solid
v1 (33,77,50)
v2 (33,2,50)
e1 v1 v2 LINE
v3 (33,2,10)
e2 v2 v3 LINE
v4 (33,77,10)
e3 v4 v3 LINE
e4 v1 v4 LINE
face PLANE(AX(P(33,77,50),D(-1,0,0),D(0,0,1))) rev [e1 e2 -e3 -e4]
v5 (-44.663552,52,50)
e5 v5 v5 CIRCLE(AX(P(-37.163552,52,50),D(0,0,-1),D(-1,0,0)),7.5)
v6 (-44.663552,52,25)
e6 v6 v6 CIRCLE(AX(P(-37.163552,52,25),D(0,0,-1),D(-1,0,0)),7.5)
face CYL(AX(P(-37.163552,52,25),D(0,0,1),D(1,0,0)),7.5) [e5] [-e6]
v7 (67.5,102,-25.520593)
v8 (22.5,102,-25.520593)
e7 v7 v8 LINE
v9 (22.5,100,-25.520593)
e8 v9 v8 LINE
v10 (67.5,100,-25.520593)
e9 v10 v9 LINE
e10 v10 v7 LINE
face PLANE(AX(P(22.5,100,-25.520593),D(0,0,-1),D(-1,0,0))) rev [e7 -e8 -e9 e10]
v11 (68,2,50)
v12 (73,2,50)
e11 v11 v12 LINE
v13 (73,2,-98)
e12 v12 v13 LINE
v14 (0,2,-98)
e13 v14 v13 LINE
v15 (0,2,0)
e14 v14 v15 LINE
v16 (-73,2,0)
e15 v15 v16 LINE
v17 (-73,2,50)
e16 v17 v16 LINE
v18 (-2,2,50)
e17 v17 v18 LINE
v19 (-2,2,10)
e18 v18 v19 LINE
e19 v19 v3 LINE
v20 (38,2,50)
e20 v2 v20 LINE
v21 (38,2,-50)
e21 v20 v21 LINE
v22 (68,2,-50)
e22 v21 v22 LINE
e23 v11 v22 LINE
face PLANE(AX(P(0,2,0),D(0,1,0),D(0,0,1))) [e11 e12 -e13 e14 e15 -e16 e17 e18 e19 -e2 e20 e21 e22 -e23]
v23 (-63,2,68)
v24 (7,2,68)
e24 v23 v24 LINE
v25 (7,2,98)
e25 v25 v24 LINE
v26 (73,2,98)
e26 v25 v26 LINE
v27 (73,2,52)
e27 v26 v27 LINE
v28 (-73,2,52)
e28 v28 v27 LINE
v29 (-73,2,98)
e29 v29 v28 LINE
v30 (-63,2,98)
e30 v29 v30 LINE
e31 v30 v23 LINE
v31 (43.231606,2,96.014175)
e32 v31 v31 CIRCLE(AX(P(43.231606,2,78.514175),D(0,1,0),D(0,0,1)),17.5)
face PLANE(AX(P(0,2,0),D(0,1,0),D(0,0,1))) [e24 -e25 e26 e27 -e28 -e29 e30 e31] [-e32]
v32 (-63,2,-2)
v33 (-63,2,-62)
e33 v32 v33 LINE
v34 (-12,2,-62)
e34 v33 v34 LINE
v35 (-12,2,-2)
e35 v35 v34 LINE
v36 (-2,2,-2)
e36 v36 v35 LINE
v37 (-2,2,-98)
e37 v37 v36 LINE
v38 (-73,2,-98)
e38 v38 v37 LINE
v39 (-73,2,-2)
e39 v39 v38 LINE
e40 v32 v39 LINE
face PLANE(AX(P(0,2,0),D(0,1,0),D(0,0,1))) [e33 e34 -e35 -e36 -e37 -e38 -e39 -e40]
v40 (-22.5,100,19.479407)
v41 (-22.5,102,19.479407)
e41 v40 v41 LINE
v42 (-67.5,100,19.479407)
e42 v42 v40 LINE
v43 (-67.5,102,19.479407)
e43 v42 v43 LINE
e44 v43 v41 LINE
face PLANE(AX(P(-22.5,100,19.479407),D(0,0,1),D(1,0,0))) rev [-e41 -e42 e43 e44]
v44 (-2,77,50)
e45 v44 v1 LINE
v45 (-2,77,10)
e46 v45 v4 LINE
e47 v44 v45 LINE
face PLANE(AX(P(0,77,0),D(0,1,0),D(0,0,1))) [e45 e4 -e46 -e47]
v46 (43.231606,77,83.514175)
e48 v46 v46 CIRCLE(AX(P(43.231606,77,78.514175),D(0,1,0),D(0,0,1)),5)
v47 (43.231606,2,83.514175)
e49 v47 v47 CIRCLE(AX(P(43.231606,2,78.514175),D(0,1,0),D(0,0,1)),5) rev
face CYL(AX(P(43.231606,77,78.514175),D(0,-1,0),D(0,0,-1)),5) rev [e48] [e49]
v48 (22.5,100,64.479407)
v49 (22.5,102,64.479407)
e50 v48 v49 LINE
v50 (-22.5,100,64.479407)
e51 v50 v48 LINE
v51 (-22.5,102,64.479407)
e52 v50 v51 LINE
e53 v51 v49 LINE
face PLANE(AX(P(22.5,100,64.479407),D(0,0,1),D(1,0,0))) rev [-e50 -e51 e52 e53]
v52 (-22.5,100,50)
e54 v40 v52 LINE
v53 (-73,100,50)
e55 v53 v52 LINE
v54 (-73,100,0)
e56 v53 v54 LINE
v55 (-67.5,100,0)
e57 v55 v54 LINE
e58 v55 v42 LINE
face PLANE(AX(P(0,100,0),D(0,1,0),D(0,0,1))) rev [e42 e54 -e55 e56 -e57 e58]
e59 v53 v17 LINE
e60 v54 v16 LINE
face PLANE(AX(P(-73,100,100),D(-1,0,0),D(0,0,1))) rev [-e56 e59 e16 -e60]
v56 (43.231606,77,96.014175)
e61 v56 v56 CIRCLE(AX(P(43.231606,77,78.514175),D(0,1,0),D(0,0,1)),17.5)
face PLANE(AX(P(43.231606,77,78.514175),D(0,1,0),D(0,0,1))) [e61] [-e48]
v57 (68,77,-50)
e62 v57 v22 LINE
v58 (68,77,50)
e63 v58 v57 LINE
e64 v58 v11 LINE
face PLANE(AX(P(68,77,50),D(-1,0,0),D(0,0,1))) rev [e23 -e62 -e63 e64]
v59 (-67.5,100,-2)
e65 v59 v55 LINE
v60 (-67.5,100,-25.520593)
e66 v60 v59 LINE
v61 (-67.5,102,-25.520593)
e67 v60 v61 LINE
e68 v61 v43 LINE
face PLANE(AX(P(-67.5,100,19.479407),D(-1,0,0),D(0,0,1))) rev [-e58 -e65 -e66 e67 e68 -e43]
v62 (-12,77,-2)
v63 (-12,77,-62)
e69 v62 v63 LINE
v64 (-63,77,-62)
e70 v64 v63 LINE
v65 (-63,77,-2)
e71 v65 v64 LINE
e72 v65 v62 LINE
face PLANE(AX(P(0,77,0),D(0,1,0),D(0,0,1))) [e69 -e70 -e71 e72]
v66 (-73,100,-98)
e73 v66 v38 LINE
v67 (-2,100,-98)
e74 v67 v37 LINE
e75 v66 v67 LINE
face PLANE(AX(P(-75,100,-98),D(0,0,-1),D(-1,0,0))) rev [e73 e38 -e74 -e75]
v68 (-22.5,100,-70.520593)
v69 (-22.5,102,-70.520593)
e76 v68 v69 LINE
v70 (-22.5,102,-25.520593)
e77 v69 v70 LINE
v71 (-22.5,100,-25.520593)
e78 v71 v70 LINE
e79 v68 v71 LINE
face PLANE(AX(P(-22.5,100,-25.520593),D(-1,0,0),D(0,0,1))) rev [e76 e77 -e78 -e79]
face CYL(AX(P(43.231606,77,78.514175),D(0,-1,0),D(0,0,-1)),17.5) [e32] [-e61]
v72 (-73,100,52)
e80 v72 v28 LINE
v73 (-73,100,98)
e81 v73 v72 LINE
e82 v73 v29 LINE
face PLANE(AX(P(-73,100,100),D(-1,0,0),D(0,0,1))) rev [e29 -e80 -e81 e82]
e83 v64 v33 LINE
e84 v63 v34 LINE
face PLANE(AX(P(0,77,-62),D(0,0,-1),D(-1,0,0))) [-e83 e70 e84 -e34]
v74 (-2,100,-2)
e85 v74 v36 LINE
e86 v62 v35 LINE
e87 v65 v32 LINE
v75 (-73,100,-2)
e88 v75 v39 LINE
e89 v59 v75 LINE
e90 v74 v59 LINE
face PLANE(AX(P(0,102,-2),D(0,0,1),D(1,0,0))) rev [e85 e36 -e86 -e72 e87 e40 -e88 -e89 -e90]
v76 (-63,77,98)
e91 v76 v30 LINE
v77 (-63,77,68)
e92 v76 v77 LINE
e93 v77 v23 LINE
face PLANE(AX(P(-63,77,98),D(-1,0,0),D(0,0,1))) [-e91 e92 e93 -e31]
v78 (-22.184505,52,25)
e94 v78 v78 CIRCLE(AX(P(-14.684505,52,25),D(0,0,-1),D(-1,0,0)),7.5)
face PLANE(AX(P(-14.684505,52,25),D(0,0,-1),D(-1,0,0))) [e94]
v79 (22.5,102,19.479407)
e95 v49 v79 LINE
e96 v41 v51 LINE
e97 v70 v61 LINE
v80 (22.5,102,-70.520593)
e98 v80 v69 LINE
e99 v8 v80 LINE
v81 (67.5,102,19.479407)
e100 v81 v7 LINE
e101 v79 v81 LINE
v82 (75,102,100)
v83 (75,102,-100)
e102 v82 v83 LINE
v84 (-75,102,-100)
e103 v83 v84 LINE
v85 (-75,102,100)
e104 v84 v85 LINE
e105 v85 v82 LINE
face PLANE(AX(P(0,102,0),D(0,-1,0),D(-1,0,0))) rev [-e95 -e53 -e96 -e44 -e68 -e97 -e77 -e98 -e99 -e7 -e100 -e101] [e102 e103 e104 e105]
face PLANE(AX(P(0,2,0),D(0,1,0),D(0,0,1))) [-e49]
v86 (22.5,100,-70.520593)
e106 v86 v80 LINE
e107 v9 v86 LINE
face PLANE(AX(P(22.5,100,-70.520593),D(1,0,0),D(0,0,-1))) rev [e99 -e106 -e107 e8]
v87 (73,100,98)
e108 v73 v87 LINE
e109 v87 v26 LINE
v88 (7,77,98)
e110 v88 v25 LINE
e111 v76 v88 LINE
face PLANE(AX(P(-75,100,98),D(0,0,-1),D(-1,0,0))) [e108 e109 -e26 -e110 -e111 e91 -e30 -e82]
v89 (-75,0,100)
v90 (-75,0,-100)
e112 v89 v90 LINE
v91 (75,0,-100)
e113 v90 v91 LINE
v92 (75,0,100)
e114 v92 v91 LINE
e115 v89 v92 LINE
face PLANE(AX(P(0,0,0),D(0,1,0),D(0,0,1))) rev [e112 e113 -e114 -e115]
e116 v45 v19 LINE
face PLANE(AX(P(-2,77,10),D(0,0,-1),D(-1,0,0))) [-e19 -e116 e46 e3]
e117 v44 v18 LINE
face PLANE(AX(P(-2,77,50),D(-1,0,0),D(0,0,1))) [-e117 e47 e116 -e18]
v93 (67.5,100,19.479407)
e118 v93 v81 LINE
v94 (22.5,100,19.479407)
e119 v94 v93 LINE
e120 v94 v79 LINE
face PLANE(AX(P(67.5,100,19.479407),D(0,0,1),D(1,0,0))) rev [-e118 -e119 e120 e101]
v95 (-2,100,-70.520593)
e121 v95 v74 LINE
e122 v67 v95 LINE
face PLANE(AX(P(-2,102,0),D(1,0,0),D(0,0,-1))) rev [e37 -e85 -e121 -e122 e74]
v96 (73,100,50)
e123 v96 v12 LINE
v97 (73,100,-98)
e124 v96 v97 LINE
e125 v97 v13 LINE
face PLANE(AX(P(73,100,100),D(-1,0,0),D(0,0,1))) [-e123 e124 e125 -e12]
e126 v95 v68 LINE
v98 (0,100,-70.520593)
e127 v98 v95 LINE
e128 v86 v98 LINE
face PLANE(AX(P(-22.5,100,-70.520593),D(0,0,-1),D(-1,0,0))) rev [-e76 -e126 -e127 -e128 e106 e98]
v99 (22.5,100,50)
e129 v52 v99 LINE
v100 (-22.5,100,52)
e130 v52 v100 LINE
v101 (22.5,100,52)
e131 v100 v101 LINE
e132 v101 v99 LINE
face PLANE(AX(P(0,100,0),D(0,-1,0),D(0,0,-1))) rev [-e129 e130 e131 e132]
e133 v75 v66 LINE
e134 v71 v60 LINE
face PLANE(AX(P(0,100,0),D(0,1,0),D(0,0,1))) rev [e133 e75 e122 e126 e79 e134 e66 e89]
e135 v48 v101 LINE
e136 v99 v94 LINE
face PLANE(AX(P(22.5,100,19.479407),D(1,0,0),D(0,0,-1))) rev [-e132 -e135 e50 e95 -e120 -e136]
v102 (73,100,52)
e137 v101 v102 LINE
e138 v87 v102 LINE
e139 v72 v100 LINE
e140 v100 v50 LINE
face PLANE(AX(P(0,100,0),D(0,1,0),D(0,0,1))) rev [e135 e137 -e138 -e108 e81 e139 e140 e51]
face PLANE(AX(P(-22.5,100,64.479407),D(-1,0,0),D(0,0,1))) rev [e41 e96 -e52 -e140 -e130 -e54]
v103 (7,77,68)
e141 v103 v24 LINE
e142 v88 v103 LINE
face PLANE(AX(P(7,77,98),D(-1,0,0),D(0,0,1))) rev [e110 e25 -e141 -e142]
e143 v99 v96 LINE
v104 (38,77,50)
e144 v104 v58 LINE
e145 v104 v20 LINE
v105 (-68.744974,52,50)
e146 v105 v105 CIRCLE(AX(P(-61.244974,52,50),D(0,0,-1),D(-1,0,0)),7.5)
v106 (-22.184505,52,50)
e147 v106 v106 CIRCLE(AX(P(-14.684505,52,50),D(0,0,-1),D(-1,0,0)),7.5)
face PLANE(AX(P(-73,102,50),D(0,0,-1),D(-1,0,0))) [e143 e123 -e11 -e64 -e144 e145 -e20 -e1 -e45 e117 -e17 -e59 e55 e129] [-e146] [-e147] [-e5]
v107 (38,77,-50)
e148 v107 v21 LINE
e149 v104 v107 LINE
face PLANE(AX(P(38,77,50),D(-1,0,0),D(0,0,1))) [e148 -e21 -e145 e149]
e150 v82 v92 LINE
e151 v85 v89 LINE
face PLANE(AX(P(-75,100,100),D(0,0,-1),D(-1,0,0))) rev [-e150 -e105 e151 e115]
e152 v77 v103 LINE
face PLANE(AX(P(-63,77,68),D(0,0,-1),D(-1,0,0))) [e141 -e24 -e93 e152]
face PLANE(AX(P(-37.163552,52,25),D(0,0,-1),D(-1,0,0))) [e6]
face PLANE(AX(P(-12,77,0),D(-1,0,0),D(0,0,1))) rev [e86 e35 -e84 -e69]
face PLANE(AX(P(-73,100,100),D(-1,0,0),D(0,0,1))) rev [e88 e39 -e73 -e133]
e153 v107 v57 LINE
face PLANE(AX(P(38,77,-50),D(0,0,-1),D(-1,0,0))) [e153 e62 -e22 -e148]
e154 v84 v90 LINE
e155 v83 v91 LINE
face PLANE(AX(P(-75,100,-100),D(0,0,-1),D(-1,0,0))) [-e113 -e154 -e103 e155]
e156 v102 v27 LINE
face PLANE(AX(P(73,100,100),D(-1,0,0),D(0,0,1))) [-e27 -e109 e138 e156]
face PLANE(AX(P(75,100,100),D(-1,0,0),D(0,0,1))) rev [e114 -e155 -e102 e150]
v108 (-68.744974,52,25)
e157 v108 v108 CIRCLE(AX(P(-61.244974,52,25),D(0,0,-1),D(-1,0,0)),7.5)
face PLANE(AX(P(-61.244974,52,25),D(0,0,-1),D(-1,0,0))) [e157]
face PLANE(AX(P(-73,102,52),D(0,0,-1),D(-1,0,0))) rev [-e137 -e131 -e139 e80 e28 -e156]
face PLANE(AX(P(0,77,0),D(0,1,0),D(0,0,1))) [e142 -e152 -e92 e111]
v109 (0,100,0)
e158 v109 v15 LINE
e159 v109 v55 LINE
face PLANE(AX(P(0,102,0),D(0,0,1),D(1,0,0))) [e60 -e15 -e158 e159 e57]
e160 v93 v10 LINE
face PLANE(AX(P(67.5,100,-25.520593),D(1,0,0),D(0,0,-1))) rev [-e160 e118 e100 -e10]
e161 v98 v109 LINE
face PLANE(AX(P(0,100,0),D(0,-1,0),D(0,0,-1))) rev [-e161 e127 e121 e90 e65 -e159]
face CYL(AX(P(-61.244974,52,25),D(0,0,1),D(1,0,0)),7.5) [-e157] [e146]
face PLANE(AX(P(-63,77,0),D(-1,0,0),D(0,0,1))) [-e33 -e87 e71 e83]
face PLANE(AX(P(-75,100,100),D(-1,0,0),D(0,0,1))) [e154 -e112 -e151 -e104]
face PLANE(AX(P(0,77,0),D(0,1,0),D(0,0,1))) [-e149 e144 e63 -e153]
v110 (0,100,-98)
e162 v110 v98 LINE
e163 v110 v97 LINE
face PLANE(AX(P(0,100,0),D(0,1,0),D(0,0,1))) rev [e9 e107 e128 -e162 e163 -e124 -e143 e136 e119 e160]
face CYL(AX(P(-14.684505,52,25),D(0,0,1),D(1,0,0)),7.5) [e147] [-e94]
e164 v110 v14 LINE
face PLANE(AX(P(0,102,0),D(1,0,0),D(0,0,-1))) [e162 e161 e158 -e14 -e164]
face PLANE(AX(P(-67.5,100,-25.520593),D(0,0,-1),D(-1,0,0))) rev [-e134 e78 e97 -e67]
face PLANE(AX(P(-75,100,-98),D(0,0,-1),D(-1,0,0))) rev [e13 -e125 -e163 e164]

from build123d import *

# Parameters (mm, degrees)
CASING_SKETCH_W     = 150
CASING_SKETCH_H     = 200
CASING_DEPTH        = 100
SHELL1_T            = -2
SKETCH3_W           = 146
SKETCH3_H           = 2
COMPARTMENTS_DEPTH  = 100
SKETCH4_W           = 51
SKETCH4_H           = 60
SKETCH4_W_2         = 30
SKETCH4_H_2         = 100
SKETCH4_W_3         = 35
SKETCH4_H_3         = 40
SKETCH4_W_4         = 70
SKETCH4_H_4         = 30
MEDICINES_DEPTH     = 75
SKETCH6_R           = 17.5
SKETCH6_R_2         = 5
BANDAGE_DEPTH       = 75
SKETCH7_R           = 7.5
VIALS_DEPTH         = 25
SKETCH9_W           = 150
SKETCH9_H           = 200
BOSS_EXTRUDE1_DEPTH = 2
CUT_EXTRUDE1_DEPTH  = 2


with BuildPart() as part:
    # Casing Sketch → Casing (new body)
    with BuildSketch(Plane(origin=(0, 0, 0), x_dir=(1, 0, 0), z_dir=(0, 1, 0))):
        Rectangle(CASING_SKETCH_W, CASING_SKETCH_H)
    extrude(amount=CASING_DEPTH)

    # Shell1
    shell1_openings = [part.faces().sort_by_distance(p)[0] for p in [
        (0, 100, 0),
    ]]
    offset(amount=SHELL1_T, openings=shell1_openings, kind=Kind.INTERSECTION)

    # Sketch3 → Compartments (add)
    with BuildSketch(Plane(origin=(0, 2, 0), x_dir=(1, 0, 0), z_dir=(0, 1, 0))):
        Polygon((-73, 0), (0, 0), (0, 98), (-2, 98), (-2, 2), (-73, 2), align=None)
        with Locations((0, -51)):
            Rectangle(SKETCH3_W, SKETCH3_H)
    extrude(amount=COMPARTMENTS_DEPTH)

    # Sketch4 → Medicines (add)
    with BuildSketch(Plane(origin=(0, 2, 0), x_dir=(1, 0, 0), z_dir=(0, 1, 0))):
        with Locations((-37.5, 32)):
            Rectangle(SKETCH4_W, SKETCH4_H)
        with Locations((53, 0)):
            Rectangle(SKETCH4_W_2, SKETCH4_H_2)
        with Locations((15.5, -30)):
            Rectangle(SKETCH4_W_3, SKETCH4_H_3)
        with Locations((-28, -83)):
            Rectangle(SKETCH4_W_4, SKETCH4_H_4)
    extrude(amount=MEDICINES_DEPTH)

    # Sketch6 → Bandage (add)
    with BuildSketch(Plane(origin=(0, 2, 0), x_dir=(1, 0, 0), z_dir=(0, 1, 0))):
        with Locations((43.231606139, -78.51417502)):
            Circle(SKETCH6_R)
        with Locations((43.231606139, -78.51417502)):
            Circle(SKETCH6_R_2, mode=Mode.SUBTRACT)
    extrude(amount=BANDAGE_DEPTH)

    # Sketch7 → Vials (add)
    with BuildSketch(Plane(origin=(0, 0, 50), x_dir=(-1, 0, 0), z_dir=(0, 0, -1))):
        with Locations((61.244974069, 52)):
            Circle(SKETCH7_R)
        with Locations((37.16355204, 52)):
            Circle(SKETCH7_R)
        with Locations((14.684505224, 52)):
            Circle(SKETCH7_R)
    extrude(amount=VIALS_DEPTH)

    # Sketch9 → Boss-Extrude1 (add)
    with BuildSketch(Plane(origin=(0, 100, 0), x_dir=(1, 0, 0), z_dir=(0, 1, 0))):
        Rectangle(SKETCH9_W, SKETCH9_H)
    extrude(amount=BOSS_EXTRUDE1_DEPTH)

    # Sketch10 → Cut-Extrude1 (cut)
    with BuildSketch(Plane(origin=(0, 102, 0), x_dir=(1, 0, 0), z_dir=(0, 1, 0))):
        Polygon((-22.5, 70.520593301), (22.5, 70.520593301), (22.5, 25.520593301), (67.5, 25.520593301), (67.5, -19.479406699), (22.5, -19.479406699), (22.5, -64.479406699), (-22.5, -64.479406699), (-22.5, -19.479406699), (-67.5, -19.479406699), (-67.5, 25.520593301), (-22.5, 25.520593301), align=None)
    extrude(amount=-CUT_EXTRUDE1_DEPTH, mode=Mode.SUBTRACT)


solid = part.part
